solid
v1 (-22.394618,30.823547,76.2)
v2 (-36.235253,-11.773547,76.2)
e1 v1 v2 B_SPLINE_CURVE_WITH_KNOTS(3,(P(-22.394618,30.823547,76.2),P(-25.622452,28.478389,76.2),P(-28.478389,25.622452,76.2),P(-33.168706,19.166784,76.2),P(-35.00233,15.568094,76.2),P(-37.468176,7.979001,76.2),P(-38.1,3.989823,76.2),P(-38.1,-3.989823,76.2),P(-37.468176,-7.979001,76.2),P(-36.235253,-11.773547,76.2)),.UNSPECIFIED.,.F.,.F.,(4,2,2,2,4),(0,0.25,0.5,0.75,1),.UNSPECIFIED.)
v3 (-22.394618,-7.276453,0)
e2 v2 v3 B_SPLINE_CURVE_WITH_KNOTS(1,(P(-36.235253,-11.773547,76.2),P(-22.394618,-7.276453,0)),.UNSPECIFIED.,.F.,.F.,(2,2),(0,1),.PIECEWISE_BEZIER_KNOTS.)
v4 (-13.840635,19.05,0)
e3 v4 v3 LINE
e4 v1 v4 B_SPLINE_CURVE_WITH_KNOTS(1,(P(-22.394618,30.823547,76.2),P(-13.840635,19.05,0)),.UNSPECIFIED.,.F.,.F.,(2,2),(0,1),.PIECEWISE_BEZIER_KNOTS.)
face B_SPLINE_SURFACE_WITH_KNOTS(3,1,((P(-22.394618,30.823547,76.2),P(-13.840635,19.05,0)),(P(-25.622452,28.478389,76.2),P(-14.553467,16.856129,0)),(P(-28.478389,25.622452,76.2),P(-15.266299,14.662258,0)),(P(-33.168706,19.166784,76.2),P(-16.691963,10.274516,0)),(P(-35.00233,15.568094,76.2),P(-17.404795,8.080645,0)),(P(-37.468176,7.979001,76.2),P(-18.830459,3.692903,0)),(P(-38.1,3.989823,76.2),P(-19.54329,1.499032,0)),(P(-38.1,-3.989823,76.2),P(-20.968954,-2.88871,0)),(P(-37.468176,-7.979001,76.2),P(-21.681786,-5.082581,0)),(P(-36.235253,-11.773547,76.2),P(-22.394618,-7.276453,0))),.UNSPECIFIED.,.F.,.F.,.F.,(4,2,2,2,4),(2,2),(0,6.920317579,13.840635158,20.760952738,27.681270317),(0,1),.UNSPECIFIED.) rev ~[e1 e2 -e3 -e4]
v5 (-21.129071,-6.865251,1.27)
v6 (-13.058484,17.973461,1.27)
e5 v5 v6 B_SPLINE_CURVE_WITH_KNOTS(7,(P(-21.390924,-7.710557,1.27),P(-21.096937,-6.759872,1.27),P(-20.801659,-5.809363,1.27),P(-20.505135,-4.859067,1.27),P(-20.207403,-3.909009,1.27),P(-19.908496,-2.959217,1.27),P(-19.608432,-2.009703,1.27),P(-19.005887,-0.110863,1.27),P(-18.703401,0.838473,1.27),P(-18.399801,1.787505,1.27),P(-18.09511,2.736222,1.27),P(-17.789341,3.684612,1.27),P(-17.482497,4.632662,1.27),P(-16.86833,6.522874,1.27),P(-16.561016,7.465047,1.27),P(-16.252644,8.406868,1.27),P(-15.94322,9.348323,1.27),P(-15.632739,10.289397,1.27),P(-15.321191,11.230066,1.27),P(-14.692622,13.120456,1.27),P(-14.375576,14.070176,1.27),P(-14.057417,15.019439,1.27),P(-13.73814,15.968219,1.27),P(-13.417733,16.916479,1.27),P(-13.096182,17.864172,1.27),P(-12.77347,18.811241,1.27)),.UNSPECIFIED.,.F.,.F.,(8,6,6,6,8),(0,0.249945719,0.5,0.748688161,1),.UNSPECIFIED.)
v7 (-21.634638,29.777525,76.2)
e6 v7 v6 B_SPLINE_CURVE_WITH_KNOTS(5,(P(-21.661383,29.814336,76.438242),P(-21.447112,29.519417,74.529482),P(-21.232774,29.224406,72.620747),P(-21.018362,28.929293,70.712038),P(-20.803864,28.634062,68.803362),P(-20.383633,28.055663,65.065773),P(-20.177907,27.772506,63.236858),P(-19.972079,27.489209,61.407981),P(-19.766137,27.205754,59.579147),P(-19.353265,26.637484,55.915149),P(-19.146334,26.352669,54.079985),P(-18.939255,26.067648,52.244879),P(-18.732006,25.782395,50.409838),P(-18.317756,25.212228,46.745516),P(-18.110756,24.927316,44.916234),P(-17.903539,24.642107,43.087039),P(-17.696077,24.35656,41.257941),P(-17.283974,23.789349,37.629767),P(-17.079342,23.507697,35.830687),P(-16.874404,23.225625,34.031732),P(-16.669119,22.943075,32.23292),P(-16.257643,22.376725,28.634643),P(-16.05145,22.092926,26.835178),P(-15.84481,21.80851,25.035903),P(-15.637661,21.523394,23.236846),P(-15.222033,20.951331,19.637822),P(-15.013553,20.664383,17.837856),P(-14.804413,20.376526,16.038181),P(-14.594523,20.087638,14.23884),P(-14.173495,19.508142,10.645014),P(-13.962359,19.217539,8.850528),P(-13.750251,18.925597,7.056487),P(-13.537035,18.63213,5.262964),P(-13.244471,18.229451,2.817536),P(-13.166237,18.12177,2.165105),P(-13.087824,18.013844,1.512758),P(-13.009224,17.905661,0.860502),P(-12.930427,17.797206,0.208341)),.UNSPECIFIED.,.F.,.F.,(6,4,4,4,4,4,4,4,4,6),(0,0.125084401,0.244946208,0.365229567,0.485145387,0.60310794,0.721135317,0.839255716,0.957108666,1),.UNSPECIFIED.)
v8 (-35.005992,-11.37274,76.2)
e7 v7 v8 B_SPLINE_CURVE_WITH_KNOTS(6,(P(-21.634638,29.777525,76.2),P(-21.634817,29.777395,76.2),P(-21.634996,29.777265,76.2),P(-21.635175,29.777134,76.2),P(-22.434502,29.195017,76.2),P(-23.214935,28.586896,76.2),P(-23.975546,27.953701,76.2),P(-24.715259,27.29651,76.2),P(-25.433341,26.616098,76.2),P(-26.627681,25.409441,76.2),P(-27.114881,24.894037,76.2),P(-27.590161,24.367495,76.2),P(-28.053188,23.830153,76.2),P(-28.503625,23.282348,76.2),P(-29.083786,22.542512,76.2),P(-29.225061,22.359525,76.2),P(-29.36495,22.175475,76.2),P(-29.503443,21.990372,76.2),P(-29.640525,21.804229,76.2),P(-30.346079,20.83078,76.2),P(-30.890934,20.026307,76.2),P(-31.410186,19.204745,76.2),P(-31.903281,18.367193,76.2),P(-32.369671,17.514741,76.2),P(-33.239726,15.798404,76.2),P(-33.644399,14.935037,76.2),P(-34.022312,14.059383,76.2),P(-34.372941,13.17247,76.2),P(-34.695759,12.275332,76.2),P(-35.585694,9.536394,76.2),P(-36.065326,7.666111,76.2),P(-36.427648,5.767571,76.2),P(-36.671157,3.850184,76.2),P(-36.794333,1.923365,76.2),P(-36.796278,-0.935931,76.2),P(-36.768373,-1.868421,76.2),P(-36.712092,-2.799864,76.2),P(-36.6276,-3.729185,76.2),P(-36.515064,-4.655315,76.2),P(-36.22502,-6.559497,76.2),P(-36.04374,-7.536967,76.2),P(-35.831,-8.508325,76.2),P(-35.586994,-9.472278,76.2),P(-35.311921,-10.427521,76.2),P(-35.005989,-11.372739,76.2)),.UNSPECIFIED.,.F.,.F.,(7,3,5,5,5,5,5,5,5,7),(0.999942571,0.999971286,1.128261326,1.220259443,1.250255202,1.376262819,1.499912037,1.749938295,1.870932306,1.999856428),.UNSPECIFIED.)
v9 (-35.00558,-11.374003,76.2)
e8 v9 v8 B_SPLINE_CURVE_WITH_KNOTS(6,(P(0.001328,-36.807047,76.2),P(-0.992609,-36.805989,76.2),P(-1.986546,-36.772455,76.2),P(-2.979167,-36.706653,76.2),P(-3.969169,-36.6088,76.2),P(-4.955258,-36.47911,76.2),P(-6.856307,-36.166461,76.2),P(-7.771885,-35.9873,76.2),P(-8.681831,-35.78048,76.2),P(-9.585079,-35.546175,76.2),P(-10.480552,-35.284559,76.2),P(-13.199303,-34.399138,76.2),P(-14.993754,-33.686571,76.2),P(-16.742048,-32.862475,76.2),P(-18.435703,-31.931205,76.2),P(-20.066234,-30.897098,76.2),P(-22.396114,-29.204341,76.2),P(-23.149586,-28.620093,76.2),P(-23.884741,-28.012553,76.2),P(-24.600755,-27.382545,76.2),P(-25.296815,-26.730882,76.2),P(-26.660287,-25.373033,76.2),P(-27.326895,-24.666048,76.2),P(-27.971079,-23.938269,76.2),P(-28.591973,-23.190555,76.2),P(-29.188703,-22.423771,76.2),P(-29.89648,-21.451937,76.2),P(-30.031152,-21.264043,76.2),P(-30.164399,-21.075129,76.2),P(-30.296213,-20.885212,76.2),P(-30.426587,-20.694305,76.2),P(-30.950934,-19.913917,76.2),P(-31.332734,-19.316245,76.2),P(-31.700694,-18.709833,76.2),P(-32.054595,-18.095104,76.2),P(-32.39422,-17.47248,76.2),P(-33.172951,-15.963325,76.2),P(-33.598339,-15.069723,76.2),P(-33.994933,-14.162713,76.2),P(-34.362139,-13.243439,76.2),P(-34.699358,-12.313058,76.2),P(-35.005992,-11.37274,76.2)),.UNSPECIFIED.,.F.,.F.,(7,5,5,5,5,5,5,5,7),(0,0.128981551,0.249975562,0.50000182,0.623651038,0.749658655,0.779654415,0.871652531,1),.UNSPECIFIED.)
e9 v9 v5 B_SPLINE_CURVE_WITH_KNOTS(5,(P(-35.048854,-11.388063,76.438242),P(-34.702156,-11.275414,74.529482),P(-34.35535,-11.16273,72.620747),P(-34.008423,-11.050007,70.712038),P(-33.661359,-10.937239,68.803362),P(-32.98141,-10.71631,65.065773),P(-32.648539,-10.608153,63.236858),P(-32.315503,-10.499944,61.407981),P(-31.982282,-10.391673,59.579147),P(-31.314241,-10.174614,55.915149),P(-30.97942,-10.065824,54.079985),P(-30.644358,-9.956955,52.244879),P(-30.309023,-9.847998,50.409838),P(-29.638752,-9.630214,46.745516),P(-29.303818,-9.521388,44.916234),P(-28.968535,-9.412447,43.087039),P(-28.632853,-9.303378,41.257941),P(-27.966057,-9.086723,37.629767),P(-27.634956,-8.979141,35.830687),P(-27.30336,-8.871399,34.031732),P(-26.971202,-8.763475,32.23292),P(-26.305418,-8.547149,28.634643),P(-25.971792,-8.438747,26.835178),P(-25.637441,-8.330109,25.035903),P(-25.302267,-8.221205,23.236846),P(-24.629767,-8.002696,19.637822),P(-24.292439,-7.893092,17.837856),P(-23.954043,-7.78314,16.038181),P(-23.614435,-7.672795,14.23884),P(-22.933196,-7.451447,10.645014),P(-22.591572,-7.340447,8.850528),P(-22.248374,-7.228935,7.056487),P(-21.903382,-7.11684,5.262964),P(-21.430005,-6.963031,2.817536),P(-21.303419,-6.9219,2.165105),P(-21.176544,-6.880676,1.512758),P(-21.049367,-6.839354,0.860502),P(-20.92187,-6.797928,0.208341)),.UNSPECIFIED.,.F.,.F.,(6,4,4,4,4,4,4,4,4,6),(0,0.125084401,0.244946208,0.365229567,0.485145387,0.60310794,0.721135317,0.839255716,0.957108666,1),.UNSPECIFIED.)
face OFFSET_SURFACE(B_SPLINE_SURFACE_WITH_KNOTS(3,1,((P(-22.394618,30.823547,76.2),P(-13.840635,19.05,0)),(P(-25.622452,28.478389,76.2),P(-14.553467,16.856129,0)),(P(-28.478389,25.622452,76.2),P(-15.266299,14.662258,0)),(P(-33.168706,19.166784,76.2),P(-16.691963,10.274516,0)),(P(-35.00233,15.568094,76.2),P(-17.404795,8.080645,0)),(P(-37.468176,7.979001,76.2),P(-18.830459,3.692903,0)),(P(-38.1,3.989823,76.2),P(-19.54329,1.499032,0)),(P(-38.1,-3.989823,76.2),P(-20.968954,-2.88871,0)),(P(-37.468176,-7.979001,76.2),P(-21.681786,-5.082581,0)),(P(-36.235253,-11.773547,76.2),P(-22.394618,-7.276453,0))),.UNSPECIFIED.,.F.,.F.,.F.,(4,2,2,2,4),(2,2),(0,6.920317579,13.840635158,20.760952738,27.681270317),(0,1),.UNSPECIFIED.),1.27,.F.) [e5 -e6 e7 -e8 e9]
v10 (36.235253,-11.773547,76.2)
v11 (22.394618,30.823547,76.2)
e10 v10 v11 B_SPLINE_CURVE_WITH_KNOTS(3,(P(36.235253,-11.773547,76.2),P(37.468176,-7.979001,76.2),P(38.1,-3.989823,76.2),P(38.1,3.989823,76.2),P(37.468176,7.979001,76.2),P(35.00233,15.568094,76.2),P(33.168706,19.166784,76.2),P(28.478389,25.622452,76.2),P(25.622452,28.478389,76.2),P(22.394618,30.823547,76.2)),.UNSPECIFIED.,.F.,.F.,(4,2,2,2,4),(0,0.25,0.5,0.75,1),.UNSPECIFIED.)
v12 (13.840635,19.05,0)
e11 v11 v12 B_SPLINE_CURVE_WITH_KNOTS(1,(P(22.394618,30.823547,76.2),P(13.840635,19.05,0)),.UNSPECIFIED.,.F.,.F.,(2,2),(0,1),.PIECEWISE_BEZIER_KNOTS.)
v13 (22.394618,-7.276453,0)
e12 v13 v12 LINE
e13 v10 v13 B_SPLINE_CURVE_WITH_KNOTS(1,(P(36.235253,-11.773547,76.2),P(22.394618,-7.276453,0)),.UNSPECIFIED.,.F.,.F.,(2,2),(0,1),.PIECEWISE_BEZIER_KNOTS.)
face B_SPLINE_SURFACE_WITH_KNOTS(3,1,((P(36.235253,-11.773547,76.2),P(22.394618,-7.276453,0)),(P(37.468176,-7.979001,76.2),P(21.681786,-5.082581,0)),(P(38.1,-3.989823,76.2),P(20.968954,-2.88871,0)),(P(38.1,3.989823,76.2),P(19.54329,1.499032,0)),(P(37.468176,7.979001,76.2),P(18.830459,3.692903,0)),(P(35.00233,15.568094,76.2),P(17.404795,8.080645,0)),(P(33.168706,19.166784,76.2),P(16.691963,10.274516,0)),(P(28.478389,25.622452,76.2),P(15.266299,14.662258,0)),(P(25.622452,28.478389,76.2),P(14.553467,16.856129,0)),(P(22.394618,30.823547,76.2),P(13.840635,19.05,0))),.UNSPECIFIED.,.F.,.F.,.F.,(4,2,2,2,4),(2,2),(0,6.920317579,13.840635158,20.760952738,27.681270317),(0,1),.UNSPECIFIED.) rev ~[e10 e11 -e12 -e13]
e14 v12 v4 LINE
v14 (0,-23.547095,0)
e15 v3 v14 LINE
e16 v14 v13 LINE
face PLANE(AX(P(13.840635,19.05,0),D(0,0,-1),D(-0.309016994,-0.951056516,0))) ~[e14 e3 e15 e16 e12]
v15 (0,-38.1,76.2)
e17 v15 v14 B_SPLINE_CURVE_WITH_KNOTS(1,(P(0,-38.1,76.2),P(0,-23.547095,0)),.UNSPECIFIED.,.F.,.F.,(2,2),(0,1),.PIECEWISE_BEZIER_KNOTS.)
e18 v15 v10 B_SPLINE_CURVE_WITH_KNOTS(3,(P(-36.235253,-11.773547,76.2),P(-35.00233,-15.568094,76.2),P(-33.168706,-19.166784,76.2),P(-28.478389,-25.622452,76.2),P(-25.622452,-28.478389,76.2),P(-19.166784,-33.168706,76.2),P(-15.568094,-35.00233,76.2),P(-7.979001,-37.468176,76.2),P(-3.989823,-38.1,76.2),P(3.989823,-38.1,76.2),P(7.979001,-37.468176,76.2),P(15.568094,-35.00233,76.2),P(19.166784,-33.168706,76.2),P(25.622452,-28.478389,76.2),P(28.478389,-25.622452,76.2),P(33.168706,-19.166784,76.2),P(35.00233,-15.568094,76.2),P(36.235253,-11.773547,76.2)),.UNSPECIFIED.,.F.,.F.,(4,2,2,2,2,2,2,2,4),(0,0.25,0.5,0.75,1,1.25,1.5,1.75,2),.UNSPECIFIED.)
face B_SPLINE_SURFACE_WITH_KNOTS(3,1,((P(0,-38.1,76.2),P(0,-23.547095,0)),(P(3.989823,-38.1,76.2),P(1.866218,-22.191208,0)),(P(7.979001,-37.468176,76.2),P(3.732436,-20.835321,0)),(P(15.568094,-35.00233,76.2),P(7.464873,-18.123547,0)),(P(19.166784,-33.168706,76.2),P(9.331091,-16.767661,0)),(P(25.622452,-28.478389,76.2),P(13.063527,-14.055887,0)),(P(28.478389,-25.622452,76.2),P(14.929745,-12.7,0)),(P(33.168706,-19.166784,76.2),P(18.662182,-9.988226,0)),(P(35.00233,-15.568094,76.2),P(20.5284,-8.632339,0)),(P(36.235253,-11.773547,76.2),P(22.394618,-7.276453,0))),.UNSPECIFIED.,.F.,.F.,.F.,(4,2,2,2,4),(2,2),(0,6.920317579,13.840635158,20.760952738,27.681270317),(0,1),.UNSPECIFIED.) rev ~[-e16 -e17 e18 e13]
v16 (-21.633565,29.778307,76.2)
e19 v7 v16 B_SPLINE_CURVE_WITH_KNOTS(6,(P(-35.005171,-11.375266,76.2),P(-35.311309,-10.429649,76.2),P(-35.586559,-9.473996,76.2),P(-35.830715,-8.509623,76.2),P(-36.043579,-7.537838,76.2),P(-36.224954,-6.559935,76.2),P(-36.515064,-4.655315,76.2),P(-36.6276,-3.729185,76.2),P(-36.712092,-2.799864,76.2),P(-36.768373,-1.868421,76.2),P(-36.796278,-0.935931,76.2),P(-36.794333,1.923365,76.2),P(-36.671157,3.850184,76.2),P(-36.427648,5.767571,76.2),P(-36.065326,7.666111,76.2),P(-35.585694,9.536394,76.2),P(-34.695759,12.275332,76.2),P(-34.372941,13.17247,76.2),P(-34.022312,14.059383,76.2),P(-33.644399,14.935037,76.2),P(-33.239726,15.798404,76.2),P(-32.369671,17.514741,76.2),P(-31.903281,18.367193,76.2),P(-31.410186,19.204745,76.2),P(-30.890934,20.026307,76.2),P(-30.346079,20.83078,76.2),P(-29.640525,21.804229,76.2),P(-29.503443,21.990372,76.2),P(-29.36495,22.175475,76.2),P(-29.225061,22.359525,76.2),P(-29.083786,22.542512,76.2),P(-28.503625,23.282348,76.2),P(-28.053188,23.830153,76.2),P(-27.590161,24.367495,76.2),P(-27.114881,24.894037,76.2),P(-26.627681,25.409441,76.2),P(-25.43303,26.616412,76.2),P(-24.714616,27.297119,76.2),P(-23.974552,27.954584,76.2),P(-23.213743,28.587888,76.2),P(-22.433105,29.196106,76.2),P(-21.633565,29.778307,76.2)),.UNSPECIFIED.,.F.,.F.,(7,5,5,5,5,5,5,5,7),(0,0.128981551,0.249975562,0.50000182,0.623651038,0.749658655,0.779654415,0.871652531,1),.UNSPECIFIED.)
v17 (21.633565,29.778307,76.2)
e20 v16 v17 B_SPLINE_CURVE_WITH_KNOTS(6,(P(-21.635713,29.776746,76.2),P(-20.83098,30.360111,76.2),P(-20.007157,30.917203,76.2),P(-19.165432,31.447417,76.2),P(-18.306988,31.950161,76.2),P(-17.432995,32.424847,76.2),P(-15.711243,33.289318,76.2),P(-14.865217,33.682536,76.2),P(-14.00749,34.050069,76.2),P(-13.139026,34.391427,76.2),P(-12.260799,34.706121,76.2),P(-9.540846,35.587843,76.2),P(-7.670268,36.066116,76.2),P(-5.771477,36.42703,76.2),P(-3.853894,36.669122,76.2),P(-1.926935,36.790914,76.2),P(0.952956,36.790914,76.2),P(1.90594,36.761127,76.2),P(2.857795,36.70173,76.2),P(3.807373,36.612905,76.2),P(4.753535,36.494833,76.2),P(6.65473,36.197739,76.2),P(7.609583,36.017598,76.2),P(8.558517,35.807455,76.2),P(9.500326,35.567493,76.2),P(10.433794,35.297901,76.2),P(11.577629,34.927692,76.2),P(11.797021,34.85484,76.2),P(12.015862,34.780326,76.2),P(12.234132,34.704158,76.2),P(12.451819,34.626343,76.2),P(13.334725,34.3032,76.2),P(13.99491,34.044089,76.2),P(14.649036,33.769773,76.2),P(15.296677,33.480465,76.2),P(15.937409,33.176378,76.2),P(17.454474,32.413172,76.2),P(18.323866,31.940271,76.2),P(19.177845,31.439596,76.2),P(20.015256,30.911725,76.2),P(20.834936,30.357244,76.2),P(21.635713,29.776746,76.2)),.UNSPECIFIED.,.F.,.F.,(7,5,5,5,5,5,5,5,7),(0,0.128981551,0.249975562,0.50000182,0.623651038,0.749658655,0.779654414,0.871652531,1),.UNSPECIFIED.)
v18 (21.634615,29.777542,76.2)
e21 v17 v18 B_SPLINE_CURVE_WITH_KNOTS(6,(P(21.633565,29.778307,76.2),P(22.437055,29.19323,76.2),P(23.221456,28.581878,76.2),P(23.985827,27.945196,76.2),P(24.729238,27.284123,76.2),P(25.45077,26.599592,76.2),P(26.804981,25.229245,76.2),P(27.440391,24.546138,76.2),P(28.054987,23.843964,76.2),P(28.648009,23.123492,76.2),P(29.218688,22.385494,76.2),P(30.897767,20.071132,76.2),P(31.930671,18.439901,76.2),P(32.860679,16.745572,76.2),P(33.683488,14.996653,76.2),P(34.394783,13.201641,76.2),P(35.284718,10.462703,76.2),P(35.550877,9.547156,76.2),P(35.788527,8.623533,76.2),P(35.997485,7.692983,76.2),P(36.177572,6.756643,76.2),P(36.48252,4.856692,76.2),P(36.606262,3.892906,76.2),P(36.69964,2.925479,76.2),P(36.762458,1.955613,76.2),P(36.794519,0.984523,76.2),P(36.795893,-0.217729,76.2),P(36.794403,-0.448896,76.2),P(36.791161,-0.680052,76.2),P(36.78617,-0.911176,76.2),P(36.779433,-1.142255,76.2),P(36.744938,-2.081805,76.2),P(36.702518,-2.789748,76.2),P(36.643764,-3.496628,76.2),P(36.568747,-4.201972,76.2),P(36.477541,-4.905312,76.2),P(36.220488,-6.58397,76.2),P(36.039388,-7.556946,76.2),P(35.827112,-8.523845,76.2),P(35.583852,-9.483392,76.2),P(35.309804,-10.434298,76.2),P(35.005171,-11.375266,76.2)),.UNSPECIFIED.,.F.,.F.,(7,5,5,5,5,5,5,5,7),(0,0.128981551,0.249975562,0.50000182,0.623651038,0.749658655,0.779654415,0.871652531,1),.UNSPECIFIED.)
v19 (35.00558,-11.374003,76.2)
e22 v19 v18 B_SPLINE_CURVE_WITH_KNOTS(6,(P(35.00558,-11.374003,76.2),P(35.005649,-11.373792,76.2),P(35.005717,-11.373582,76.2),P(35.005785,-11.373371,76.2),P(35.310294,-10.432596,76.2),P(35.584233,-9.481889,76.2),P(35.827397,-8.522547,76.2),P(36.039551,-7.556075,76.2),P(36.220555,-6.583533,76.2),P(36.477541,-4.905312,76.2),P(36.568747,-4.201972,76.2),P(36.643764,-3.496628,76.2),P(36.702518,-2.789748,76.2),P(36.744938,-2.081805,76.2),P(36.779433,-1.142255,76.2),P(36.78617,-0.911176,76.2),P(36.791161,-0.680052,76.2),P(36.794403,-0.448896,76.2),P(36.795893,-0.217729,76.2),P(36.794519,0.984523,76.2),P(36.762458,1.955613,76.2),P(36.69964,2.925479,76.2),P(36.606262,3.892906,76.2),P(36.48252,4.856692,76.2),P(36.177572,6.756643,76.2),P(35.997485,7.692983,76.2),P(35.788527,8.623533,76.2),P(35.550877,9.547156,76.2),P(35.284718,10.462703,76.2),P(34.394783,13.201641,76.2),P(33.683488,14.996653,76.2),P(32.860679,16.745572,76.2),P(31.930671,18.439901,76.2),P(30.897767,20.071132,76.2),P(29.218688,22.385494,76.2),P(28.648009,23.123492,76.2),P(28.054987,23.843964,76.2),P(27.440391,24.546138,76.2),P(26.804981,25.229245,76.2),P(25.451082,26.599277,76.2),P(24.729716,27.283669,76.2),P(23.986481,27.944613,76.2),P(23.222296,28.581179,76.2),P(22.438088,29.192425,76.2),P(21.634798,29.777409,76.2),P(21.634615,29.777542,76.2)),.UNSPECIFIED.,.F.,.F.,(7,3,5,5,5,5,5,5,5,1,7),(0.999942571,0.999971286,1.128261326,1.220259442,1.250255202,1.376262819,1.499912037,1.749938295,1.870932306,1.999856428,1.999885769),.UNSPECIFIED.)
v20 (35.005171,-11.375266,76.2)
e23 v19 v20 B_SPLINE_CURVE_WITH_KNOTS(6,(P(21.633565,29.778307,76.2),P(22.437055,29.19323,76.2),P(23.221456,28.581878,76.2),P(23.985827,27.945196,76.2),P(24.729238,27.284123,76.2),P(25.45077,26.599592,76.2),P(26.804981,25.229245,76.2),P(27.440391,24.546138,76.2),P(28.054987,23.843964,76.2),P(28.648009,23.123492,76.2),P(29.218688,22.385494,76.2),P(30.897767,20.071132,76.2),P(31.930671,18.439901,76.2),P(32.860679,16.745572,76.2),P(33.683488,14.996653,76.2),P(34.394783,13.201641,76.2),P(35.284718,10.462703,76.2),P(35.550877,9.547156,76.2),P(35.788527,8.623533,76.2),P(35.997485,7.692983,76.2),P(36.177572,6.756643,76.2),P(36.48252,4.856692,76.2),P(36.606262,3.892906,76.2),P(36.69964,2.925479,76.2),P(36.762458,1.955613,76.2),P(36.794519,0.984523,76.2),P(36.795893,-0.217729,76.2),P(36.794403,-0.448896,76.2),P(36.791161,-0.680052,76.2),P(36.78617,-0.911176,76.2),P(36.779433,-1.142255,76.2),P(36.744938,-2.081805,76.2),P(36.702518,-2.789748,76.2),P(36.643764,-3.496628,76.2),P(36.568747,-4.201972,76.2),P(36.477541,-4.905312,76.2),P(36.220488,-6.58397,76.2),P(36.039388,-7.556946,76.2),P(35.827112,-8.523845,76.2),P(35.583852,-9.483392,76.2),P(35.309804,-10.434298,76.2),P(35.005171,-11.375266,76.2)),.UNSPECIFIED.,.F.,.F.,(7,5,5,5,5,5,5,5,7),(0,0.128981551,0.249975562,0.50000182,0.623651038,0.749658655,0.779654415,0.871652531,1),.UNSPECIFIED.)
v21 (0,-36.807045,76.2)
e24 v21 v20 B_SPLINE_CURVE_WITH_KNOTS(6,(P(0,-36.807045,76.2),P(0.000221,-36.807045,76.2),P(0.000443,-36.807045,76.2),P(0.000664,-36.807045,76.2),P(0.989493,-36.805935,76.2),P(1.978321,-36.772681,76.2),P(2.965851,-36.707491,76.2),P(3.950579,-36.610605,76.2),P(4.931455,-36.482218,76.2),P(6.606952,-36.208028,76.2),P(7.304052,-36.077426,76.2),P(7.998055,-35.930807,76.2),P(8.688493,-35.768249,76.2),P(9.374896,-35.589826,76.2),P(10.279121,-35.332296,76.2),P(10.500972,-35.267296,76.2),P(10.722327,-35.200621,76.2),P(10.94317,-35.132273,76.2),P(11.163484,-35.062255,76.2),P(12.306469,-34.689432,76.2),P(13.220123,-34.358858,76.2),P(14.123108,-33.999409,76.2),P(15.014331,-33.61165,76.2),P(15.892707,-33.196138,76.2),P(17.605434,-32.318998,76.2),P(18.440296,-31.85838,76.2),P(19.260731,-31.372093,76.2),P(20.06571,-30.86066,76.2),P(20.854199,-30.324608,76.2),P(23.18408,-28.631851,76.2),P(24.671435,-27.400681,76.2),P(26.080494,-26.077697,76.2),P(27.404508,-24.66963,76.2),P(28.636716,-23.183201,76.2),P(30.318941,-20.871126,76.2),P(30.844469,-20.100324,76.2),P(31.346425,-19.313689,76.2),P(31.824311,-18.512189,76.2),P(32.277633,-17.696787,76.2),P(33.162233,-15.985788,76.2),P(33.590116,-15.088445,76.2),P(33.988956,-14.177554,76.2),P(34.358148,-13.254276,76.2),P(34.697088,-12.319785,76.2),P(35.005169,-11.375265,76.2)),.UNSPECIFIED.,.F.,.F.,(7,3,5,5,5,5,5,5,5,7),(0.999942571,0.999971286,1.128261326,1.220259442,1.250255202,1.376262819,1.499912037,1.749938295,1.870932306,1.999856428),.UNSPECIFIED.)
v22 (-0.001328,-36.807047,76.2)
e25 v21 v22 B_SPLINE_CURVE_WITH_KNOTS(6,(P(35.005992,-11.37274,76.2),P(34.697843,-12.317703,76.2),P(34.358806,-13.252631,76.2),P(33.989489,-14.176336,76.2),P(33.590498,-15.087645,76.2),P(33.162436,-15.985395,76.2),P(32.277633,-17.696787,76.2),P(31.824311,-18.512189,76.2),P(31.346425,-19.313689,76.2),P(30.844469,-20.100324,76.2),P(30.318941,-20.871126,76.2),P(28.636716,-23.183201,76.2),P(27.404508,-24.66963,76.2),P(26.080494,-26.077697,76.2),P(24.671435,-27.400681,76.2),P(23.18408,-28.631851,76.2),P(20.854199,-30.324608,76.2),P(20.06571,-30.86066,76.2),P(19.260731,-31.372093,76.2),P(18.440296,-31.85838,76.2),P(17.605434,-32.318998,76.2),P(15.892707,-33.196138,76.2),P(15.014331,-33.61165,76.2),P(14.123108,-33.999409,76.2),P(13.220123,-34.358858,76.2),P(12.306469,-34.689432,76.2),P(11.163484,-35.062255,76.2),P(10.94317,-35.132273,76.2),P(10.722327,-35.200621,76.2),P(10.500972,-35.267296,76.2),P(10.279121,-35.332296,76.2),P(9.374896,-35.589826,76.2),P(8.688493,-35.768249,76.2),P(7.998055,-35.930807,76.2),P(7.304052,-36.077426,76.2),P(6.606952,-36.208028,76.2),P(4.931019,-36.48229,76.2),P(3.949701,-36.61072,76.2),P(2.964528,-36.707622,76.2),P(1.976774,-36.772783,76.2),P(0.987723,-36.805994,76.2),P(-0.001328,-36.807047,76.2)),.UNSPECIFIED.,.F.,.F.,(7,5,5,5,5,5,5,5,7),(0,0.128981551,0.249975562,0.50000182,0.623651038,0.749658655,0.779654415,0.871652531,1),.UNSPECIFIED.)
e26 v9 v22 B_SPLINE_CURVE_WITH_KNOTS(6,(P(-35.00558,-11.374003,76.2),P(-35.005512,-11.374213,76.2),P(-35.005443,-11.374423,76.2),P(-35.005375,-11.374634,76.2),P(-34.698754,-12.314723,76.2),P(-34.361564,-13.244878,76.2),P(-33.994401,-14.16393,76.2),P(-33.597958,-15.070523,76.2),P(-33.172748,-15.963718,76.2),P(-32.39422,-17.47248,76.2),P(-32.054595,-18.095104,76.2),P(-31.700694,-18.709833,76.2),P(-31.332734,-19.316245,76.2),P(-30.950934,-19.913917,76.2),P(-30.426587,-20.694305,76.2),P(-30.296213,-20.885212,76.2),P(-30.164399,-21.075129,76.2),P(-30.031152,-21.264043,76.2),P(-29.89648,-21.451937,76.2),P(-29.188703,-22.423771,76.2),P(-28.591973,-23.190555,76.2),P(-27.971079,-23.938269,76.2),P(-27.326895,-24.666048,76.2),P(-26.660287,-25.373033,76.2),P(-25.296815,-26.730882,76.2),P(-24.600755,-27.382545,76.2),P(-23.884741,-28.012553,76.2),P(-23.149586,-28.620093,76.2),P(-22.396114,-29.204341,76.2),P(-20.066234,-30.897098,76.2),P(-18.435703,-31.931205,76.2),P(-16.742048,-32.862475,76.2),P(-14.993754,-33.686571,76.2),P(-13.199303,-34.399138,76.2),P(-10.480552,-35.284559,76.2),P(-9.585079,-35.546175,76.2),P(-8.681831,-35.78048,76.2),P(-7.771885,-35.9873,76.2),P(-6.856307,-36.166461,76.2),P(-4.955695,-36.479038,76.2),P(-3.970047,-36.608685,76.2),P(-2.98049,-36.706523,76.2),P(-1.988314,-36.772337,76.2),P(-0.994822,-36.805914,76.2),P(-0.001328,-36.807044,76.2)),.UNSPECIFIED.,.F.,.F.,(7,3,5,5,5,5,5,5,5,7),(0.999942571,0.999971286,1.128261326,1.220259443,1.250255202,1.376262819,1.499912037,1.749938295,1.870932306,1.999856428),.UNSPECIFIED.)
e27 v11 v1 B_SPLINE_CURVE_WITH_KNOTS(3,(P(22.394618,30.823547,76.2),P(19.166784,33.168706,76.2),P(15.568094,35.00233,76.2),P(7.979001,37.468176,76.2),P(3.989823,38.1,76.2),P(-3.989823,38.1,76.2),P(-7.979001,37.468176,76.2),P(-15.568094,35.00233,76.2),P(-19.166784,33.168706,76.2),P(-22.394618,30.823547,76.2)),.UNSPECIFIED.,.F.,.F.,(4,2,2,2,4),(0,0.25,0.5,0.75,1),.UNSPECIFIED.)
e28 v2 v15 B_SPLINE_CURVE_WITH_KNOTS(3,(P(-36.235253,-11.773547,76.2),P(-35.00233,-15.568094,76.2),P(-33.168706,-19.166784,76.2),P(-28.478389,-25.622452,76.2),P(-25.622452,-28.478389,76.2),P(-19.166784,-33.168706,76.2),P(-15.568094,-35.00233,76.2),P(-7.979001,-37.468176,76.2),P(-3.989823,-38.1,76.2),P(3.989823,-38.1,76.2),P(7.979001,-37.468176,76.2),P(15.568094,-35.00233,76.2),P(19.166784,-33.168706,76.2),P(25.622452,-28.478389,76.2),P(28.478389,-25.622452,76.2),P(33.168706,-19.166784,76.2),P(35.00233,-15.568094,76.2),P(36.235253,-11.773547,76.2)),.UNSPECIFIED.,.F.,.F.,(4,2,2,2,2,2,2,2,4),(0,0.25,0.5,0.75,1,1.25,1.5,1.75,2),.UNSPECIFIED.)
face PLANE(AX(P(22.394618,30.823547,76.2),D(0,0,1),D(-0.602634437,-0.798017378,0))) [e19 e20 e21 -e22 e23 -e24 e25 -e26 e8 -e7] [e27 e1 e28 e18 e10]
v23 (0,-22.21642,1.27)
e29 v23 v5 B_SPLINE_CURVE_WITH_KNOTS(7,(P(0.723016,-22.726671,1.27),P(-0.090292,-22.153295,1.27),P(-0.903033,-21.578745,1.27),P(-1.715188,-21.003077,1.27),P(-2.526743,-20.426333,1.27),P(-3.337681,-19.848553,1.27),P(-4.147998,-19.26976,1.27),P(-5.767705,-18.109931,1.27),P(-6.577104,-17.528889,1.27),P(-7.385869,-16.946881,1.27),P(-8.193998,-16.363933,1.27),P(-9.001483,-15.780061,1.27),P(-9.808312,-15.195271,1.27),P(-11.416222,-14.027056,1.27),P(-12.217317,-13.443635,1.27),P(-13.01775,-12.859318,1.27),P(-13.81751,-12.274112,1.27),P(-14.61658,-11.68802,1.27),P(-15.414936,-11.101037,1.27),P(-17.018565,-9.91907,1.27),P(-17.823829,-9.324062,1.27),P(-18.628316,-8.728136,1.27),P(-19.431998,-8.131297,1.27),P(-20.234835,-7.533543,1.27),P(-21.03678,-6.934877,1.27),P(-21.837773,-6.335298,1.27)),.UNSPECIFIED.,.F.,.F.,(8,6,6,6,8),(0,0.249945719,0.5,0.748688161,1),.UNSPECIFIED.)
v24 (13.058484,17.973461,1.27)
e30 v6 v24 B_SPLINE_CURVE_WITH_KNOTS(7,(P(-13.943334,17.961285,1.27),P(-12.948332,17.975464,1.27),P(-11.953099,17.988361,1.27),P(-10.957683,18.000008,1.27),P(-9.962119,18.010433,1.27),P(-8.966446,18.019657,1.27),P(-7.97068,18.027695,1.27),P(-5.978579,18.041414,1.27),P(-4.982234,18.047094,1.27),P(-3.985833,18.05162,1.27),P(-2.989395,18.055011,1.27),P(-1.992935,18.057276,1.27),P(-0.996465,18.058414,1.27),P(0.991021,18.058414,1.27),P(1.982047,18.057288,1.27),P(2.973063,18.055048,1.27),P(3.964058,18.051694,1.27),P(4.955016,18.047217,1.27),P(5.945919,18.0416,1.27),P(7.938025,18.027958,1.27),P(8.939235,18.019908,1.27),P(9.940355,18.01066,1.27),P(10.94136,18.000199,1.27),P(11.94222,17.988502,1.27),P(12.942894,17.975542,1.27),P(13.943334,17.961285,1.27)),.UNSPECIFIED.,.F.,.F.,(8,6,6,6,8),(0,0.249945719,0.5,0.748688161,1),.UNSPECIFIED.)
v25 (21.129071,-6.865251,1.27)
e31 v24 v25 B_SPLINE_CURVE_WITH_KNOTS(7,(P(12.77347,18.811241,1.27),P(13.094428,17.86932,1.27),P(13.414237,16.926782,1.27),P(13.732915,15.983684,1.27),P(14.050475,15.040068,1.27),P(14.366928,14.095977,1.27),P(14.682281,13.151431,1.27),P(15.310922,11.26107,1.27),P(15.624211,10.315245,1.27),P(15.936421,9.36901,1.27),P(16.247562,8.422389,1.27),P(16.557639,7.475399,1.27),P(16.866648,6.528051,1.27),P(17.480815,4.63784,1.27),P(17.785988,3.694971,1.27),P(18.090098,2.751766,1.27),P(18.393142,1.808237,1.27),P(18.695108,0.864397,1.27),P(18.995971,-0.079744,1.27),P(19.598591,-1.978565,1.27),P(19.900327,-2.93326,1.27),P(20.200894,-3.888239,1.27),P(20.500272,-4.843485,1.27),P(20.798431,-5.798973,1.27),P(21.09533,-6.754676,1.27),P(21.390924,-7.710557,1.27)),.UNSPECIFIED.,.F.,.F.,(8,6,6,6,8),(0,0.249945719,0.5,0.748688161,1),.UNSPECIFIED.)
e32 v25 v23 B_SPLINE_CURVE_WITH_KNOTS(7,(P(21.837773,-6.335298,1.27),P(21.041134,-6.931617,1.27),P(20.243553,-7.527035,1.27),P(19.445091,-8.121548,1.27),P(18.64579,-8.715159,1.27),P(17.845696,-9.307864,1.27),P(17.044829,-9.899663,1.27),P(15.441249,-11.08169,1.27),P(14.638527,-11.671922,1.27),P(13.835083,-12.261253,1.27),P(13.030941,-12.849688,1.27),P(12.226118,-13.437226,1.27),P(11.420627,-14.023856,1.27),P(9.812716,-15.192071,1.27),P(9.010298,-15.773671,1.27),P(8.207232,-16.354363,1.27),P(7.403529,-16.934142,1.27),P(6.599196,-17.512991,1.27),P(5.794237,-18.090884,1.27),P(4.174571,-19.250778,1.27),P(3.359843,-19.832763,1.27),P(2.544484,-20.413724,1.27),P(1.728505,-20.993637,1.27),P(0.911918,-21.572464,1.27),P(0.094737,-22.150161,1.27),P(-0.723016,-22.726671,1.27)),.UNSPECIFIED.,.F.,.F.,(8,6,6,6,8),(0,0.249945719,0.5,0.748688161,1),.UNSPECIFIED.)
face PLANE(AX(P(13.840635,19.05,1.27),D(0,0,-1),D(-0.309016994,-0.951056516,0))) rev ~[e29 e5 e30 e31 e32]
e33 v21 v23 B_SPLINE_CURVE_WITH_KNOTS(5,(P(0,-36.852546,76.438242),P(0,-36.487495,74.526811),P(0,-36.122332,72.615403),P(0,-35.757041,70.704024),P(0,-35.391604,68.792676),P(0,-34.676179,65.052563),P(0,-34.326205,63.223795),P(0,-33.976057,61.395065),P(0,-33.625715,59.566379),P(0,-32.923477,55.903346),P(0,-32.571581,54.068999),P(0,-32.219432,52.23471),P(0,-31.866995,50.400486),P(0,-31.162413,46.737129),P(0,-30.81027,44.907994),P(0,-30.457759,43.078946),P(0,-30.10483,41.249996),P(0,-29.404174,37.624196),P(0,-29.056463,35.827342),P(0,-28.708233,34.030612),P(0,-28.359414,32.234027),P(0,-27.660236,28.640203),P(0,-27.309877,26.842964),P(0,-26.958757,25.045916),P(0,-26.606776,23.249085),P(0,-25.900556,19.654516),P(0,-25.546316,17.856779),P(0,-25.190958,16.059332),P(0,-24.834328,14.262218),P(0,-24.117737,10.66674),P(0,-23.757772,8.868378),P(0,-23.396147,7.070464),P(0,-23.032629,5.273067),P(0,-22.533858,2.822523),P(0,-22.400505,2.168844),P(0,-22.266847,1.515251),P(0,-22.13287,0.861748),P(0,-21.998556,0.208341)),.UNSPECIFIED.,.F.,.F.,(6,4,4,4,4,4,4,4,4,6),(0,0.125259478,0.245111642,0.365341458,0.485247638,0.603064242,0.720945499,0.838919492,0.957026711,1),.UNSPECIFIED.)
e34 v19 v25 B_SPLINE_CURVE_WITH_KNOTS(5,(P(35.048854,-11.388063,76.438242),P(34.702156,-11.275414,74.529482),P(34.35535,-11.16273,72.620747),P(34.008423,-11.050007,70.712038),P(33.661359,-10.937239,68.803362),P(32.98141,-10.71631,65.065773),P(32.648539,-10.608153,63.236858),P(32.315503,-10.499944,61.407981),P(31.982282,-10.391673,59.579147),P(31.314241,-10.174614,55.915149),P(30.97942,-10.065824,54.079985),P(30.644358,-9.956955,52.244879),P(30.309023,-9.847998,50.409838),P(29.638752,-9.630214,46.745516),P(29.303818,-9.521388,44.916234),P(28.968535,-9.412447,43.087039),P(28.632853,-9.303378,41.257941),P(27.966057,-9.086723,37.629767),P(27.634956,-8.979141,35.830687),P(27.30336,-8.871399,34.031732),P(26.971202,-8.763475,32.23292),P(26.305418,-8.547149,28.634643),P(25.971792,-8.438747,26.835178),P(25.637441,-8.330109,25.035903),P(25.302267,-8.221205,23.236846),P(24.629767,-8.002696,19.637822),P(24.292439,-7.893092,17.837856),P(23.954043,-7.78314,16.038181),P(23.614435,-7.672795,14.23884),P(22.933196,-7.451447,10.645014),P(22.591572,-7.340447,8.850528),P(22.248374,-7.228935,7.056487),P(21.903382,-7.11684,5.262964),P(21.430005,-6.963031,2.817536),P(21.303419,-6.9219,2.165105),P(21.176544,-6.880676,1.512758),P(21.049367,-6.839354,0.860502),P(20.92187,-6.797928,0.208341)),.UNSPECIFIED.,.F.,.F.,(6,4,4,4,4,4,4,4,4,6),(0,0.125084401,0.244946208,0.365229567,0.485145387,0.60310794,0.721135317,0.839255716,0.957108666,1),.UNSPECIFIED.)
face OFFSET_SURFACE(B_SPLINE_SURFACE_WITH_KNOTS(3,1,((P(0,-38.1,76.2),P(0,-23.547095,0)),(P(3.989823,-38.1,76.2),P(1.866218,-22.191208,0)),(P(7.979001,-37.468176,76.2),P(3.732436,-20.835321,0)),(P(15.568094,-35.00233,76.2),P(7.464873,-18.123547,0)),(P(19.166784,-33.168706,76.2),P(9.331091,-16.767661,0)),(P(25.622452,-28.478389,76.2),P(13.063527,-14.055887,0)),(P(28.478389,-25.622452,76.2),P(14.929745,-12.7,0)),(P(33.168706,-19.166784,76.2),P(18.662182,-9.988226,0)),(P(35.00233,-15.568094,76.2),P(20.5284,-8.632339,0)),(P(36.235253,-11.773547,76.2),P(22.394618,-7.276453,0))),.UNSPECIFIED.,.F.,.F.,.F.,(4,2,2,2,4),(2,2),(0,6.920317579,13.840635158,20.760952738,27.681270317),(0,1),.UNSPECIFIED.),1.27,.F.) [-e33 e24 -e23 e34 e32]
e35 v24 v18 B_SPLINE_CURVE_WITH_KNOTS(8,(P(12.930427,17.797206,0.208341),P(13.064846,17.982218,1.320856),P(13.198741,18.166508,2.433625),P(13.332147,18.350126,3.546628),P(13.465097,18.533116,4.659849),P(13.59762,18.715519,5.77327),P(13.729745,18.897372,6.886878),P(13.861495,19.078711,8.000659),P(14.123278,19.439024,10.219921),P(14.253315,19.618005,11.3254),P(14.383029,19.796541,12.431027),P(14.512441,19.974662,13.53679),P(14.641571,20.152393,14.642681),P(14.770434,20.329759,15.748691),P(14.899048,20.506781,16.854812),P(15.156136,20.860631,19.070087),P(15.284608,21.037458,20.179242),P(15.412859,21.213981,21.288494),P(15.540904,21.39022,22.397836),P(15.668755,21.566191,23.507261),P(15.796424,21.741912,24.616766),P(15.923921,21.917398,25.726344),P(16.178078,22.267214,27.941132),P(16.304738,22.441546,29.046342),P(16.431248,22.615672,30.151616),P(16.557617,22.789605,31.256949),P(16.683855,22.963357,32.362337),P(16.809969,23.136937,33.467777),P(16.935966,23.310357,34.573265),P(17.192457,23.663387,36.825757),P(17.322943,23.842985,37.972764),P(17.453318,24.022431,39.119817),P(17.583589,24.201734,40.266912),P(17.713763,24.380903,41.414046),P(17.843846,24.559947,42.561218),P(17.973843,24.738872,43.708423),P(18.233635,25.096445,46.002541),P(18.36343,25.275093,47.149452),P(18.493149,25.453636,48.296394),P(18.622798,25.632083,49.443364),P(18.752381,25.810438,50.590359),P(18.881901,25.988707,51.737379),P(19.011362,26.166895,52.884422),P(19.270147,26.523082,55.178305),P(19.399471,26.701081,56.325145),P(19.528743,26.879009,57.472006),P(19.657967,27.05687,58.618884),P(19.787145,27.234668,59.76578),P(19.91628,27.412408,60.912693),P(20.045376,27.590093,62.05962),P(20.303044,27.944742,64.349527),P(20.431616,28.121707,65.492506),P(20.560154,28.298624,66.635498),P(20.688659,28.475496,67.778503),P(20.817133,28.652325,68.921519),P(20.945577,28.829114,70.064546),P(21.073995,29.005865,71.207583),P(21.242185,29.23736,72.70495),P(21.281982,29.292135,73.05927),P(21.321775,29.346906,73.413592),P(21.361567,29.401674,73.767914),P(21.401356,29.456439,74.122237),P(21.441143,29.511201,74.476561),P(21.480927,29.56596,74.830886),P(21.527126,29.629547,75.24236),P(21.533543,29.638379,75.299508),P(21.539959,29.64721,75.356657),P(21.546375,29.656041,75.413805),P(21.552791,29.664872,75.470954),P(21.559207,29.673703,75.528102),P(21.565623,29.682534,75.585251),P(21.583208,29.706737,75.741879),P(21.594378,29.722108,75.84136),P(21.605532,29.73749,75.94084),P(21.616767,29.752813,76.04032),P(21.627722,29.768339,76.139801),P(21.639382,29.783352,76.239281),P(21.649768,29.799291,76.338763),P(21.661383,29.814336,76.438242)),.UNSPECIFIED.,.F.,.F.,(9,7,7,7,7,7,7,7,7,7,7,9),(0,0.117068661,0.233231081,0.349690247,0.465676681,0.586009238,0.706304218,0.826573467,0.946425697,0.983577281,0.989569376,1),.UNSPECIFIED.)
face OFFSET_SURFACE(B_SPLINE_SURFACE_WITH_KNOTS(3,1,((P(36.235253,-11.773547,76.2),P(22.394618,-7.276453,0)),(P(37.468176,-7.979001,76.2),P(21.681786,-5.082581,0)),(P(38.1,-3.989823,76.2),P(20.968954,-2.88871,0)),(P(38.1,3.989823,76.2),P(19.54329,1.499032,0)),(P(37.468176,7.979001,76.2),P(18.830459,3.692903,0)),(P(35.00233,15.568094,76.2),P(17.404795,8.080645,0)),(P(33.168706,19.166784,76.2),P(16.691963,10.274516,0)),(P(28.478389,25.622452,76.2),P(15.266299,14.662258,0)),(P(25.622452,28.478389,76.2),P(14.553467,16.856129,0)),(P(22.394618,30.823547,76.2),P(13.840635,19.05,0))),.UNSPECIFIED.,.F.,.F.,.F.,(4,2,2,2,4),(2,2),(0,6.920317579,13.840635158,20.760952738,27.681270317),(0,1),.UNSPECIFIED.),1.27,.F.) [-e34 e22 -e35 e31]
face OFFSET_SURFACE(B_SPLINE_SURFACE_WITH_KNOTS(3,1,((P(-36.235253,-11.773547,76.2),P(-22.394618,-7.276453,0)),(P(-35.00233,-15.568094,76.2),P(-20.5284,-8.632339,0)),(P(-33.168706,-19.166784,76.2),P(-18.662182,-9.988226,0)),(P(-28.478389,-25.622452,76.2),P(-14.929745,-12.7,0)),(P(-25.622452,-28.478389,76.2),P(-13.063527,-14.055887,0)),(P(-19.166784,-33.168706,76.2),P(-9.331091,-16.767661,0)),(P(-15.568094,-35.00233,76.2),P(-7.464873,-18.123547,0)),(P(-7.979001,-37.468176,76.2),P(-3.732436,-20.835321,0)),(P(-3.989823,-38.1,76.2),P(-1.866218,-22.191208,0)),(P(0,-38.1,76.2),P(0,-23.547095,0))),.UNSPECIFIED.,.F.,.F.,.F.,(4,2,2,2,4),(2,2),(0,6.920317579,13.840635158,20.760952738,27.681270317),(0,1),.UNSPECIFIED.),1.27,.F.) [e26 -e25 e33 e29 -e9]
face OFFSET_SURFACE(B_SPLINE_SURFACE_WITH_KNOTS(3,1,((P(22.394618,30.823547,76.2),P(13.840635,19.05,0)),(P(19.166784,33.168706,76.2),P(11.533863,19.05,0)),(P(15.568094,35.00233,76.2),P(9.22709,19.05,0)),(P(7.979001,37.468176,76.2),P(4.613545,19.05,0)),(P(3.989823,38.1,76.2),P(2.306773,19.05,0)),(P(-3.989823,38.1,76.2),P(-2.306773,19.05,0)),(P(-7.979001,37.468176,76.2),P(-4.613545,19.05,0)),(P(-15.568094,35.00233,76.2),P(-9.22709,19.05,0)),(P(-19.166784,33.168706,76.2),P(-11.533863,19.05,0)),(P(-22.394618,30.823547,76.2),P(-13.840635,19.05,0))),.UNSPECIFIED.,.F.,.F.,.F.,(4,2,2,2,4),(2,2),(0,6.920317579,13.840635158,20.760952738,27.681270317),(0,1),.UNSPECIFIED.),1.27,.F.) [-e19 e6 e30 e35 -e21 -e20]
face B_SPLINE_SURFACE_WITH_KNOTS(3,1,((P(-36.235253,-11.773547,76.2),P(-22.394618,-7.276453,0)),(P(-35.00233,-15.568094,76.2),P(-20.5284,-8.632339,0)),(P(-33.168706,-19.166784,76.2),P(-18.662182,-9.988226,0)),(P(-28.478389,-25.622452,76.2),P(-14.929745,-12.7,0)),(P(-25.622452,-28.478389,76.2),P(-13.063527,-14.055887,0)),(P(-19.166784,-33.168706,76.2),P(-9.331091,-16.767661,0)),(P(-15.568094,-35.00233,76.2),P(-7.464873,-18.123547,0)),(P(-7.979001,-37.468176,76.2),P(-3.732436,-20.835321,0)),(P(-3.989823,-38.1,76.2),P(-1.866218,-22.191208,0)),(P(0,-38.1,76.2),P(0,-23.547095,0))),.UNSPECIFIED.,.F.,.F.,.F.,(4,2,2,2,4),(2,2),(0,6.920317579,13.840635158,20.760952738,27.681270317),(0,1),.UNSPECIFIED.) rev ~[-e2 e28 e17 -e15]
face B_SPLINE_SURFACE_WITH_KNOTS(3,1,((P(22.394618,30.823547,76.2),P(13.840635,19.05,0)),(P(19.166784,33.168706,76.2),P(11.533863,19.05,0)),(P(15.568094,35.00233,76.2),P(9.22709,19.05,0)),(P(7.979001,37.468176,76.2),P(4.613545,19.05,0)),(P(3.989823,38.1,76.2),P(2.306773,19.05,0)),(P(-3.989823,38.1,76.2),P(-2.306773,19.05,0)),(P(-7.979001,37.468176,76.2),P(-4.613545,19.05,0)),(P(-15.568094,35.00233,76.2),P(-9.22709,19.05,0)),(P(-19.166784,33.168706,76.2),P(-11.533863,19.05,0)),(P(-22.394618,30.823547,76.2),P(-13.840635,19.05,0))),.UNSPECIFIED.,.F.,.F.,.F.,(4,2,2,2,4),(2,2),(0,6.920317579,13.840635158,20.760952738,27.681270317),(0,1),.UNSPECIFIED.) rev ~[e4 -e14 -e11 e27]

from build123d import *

# Parameters (mm, degrees)
F4_T = 1.27


# Not quite as in the source:
# - the arcs of a loft's sections are written as splines that run evenly, so that the points pair up as in the source's solid
# - a shell that OpenCascade refuses in one call is made with other operations: the cavity is built on its own and cut out


with BuildPart() as f3:
    # F2 (on offset) → F3 section 0
    with BuildSketch(Plane.XY.offset(76.2)):
        with BuildLine():
            add(Edge.make_bspline(
                [(22.3946181123, 30.8235474857), (19.1667837677, 33.1687064104), (15.5680943349, 35.0023302613), (7.9790006365, 37.4681762804), (3.9898226701, 38.1), (-3.9898226701, 38.1), (-7.9790006365, 37.4681762804), (-15.5680943349, 35.0023302613), (-19.1667837677, 33.1687064104), (-22.3946181123, 30.8235474857)],
                knots=[0, 0, 0, 0, 0.25, 0.25, 0.5, 0.5, 0.75, 0.75, 1, 1, 1, 1], degree=3))
            add(Edge.make_bspline(
                [(-22.3946181123, 30.8235474857), (-25.622452457, 28.478388561), (-28.478388561, 25.622452457), (-33.1687064104, 19.1667837677), (-35.0023302613, 15.5680943349), (-37.4681762804, 7.9790006365), (-38.1, 3.9898226701), (-38.1, -3.9898226701), (-37.4681762804, -7.9790006365), (-36.2352532708, -11.7735474857)],
                knots=[0, 0, 0, 0, 0.25, 0.25, 0.5, 0.5, 0.75, 0.75, 1, 1, 1, 1], degree=3))
            add(Edge.make_bspline(
                [(-36.2352532708, -11.7735474857), (-35.0023302613, -15.5680943349), (-33.1687064104, -19.1667837677), (-28.478388561, -25.622452457), (-25.622452457, -28.478388561), (-19.1667837677, -33.1687064104), (-15.5680943349, -35.0023302613), (-7.9790006365, -37.4681762804), (-3.9898226701, -38.1), (0, -38.1)],
                knots=[0, 0, 0, 0, 0.25, 0.25, 0.5, 0.5, 0.75, 0.75, 1, 1, 1, 1], degree=3))
            add(Edge.make_bspline(
                [(0, -38.1), (3.9898226701, -38.1), (7.9790006365, -37.4681762804), (15.5680943349, -35.0023302613), (19.1667837677, -33.1687064104), (25.622452457, -28.478388561), (28.478388561, -25.622452457), (33.1687064104, -19.1667837677), (35.0023302613, -15.5680943349), (36.2352532708, -11.7735474857)],
                knots=[0, 0, 0, 0, 0.25, 0.25, 0.5, 0.5, 0.75, 0.75, 1, 1, 1, 1], degree=3))
            add(Edge.make_bspline(
                [(36.2352532708, -11.7735474857), (37.4681762804, -7.9790006365), (38.1, -3.9898226701), (38.1, 3.9898226701), (37.4681762804, 7.9790006365), (35.0023302613, 15.5680943349), (33.1687064104, 19.1667837677), (28.478388561, 25.622452457), (25.622452457, 28.478388561), (22.3946181123, 30.8235474857)],
                knots=[0, 0, 0, 0, 0.25, 0.25, 0.5, 0.5, 0.75, 0.75, 1, 1, 1, 1], degree=3))
        make_face()
    # F0 (on Top) → F3 section 1
    with BuildSketch(Plane.XY):
        Polygon((13.8406351585, 19.05), (-13.8406351585, 19.05), (-22.3946181123, -7.2764525143), (0, -23.5470949714), (22.3946181123, -7.2764525143), align=None)
    loft(ruled=True)

    # F4: shell of thickness 1.27, made by hand


with BuildPart() as f4_core1:
    # F4_t2: copy of F3
    add(f3.part)

    # the walls: a layer under each face that stays
    f4_faces = [f4_core1.faces().sort_by_distance(p)[0] for p in [
        (0, 28.575, 38.1),
        (-27.1764399531, 8.8301606143, 38.1),
        (-16.7959635843, -23.1176606143, 38.1),
        (16.7959635843, -23.1176606143, 38.1),
        (27.1764399531, 8.8301606143, 38.1),
        (-1.3216630512, 1.8191131286, 0),
    ]]
    thicken(f4_faces, amount=-F4_T, mode=Mode.SUBTRACT)


with BuildPart() as f3_1:
    add(f3.part)

    # what is left inside the walls is the cavity
    f4_cavity = [f4_core1.part.solids().sort_by_distance(p)[0] for p in [
        (10.168811, -6.868871, 76.1873),
    ]]
    add(f4_cavity, mode=Mode.SUBTRACT)


solid = f3_1.part
